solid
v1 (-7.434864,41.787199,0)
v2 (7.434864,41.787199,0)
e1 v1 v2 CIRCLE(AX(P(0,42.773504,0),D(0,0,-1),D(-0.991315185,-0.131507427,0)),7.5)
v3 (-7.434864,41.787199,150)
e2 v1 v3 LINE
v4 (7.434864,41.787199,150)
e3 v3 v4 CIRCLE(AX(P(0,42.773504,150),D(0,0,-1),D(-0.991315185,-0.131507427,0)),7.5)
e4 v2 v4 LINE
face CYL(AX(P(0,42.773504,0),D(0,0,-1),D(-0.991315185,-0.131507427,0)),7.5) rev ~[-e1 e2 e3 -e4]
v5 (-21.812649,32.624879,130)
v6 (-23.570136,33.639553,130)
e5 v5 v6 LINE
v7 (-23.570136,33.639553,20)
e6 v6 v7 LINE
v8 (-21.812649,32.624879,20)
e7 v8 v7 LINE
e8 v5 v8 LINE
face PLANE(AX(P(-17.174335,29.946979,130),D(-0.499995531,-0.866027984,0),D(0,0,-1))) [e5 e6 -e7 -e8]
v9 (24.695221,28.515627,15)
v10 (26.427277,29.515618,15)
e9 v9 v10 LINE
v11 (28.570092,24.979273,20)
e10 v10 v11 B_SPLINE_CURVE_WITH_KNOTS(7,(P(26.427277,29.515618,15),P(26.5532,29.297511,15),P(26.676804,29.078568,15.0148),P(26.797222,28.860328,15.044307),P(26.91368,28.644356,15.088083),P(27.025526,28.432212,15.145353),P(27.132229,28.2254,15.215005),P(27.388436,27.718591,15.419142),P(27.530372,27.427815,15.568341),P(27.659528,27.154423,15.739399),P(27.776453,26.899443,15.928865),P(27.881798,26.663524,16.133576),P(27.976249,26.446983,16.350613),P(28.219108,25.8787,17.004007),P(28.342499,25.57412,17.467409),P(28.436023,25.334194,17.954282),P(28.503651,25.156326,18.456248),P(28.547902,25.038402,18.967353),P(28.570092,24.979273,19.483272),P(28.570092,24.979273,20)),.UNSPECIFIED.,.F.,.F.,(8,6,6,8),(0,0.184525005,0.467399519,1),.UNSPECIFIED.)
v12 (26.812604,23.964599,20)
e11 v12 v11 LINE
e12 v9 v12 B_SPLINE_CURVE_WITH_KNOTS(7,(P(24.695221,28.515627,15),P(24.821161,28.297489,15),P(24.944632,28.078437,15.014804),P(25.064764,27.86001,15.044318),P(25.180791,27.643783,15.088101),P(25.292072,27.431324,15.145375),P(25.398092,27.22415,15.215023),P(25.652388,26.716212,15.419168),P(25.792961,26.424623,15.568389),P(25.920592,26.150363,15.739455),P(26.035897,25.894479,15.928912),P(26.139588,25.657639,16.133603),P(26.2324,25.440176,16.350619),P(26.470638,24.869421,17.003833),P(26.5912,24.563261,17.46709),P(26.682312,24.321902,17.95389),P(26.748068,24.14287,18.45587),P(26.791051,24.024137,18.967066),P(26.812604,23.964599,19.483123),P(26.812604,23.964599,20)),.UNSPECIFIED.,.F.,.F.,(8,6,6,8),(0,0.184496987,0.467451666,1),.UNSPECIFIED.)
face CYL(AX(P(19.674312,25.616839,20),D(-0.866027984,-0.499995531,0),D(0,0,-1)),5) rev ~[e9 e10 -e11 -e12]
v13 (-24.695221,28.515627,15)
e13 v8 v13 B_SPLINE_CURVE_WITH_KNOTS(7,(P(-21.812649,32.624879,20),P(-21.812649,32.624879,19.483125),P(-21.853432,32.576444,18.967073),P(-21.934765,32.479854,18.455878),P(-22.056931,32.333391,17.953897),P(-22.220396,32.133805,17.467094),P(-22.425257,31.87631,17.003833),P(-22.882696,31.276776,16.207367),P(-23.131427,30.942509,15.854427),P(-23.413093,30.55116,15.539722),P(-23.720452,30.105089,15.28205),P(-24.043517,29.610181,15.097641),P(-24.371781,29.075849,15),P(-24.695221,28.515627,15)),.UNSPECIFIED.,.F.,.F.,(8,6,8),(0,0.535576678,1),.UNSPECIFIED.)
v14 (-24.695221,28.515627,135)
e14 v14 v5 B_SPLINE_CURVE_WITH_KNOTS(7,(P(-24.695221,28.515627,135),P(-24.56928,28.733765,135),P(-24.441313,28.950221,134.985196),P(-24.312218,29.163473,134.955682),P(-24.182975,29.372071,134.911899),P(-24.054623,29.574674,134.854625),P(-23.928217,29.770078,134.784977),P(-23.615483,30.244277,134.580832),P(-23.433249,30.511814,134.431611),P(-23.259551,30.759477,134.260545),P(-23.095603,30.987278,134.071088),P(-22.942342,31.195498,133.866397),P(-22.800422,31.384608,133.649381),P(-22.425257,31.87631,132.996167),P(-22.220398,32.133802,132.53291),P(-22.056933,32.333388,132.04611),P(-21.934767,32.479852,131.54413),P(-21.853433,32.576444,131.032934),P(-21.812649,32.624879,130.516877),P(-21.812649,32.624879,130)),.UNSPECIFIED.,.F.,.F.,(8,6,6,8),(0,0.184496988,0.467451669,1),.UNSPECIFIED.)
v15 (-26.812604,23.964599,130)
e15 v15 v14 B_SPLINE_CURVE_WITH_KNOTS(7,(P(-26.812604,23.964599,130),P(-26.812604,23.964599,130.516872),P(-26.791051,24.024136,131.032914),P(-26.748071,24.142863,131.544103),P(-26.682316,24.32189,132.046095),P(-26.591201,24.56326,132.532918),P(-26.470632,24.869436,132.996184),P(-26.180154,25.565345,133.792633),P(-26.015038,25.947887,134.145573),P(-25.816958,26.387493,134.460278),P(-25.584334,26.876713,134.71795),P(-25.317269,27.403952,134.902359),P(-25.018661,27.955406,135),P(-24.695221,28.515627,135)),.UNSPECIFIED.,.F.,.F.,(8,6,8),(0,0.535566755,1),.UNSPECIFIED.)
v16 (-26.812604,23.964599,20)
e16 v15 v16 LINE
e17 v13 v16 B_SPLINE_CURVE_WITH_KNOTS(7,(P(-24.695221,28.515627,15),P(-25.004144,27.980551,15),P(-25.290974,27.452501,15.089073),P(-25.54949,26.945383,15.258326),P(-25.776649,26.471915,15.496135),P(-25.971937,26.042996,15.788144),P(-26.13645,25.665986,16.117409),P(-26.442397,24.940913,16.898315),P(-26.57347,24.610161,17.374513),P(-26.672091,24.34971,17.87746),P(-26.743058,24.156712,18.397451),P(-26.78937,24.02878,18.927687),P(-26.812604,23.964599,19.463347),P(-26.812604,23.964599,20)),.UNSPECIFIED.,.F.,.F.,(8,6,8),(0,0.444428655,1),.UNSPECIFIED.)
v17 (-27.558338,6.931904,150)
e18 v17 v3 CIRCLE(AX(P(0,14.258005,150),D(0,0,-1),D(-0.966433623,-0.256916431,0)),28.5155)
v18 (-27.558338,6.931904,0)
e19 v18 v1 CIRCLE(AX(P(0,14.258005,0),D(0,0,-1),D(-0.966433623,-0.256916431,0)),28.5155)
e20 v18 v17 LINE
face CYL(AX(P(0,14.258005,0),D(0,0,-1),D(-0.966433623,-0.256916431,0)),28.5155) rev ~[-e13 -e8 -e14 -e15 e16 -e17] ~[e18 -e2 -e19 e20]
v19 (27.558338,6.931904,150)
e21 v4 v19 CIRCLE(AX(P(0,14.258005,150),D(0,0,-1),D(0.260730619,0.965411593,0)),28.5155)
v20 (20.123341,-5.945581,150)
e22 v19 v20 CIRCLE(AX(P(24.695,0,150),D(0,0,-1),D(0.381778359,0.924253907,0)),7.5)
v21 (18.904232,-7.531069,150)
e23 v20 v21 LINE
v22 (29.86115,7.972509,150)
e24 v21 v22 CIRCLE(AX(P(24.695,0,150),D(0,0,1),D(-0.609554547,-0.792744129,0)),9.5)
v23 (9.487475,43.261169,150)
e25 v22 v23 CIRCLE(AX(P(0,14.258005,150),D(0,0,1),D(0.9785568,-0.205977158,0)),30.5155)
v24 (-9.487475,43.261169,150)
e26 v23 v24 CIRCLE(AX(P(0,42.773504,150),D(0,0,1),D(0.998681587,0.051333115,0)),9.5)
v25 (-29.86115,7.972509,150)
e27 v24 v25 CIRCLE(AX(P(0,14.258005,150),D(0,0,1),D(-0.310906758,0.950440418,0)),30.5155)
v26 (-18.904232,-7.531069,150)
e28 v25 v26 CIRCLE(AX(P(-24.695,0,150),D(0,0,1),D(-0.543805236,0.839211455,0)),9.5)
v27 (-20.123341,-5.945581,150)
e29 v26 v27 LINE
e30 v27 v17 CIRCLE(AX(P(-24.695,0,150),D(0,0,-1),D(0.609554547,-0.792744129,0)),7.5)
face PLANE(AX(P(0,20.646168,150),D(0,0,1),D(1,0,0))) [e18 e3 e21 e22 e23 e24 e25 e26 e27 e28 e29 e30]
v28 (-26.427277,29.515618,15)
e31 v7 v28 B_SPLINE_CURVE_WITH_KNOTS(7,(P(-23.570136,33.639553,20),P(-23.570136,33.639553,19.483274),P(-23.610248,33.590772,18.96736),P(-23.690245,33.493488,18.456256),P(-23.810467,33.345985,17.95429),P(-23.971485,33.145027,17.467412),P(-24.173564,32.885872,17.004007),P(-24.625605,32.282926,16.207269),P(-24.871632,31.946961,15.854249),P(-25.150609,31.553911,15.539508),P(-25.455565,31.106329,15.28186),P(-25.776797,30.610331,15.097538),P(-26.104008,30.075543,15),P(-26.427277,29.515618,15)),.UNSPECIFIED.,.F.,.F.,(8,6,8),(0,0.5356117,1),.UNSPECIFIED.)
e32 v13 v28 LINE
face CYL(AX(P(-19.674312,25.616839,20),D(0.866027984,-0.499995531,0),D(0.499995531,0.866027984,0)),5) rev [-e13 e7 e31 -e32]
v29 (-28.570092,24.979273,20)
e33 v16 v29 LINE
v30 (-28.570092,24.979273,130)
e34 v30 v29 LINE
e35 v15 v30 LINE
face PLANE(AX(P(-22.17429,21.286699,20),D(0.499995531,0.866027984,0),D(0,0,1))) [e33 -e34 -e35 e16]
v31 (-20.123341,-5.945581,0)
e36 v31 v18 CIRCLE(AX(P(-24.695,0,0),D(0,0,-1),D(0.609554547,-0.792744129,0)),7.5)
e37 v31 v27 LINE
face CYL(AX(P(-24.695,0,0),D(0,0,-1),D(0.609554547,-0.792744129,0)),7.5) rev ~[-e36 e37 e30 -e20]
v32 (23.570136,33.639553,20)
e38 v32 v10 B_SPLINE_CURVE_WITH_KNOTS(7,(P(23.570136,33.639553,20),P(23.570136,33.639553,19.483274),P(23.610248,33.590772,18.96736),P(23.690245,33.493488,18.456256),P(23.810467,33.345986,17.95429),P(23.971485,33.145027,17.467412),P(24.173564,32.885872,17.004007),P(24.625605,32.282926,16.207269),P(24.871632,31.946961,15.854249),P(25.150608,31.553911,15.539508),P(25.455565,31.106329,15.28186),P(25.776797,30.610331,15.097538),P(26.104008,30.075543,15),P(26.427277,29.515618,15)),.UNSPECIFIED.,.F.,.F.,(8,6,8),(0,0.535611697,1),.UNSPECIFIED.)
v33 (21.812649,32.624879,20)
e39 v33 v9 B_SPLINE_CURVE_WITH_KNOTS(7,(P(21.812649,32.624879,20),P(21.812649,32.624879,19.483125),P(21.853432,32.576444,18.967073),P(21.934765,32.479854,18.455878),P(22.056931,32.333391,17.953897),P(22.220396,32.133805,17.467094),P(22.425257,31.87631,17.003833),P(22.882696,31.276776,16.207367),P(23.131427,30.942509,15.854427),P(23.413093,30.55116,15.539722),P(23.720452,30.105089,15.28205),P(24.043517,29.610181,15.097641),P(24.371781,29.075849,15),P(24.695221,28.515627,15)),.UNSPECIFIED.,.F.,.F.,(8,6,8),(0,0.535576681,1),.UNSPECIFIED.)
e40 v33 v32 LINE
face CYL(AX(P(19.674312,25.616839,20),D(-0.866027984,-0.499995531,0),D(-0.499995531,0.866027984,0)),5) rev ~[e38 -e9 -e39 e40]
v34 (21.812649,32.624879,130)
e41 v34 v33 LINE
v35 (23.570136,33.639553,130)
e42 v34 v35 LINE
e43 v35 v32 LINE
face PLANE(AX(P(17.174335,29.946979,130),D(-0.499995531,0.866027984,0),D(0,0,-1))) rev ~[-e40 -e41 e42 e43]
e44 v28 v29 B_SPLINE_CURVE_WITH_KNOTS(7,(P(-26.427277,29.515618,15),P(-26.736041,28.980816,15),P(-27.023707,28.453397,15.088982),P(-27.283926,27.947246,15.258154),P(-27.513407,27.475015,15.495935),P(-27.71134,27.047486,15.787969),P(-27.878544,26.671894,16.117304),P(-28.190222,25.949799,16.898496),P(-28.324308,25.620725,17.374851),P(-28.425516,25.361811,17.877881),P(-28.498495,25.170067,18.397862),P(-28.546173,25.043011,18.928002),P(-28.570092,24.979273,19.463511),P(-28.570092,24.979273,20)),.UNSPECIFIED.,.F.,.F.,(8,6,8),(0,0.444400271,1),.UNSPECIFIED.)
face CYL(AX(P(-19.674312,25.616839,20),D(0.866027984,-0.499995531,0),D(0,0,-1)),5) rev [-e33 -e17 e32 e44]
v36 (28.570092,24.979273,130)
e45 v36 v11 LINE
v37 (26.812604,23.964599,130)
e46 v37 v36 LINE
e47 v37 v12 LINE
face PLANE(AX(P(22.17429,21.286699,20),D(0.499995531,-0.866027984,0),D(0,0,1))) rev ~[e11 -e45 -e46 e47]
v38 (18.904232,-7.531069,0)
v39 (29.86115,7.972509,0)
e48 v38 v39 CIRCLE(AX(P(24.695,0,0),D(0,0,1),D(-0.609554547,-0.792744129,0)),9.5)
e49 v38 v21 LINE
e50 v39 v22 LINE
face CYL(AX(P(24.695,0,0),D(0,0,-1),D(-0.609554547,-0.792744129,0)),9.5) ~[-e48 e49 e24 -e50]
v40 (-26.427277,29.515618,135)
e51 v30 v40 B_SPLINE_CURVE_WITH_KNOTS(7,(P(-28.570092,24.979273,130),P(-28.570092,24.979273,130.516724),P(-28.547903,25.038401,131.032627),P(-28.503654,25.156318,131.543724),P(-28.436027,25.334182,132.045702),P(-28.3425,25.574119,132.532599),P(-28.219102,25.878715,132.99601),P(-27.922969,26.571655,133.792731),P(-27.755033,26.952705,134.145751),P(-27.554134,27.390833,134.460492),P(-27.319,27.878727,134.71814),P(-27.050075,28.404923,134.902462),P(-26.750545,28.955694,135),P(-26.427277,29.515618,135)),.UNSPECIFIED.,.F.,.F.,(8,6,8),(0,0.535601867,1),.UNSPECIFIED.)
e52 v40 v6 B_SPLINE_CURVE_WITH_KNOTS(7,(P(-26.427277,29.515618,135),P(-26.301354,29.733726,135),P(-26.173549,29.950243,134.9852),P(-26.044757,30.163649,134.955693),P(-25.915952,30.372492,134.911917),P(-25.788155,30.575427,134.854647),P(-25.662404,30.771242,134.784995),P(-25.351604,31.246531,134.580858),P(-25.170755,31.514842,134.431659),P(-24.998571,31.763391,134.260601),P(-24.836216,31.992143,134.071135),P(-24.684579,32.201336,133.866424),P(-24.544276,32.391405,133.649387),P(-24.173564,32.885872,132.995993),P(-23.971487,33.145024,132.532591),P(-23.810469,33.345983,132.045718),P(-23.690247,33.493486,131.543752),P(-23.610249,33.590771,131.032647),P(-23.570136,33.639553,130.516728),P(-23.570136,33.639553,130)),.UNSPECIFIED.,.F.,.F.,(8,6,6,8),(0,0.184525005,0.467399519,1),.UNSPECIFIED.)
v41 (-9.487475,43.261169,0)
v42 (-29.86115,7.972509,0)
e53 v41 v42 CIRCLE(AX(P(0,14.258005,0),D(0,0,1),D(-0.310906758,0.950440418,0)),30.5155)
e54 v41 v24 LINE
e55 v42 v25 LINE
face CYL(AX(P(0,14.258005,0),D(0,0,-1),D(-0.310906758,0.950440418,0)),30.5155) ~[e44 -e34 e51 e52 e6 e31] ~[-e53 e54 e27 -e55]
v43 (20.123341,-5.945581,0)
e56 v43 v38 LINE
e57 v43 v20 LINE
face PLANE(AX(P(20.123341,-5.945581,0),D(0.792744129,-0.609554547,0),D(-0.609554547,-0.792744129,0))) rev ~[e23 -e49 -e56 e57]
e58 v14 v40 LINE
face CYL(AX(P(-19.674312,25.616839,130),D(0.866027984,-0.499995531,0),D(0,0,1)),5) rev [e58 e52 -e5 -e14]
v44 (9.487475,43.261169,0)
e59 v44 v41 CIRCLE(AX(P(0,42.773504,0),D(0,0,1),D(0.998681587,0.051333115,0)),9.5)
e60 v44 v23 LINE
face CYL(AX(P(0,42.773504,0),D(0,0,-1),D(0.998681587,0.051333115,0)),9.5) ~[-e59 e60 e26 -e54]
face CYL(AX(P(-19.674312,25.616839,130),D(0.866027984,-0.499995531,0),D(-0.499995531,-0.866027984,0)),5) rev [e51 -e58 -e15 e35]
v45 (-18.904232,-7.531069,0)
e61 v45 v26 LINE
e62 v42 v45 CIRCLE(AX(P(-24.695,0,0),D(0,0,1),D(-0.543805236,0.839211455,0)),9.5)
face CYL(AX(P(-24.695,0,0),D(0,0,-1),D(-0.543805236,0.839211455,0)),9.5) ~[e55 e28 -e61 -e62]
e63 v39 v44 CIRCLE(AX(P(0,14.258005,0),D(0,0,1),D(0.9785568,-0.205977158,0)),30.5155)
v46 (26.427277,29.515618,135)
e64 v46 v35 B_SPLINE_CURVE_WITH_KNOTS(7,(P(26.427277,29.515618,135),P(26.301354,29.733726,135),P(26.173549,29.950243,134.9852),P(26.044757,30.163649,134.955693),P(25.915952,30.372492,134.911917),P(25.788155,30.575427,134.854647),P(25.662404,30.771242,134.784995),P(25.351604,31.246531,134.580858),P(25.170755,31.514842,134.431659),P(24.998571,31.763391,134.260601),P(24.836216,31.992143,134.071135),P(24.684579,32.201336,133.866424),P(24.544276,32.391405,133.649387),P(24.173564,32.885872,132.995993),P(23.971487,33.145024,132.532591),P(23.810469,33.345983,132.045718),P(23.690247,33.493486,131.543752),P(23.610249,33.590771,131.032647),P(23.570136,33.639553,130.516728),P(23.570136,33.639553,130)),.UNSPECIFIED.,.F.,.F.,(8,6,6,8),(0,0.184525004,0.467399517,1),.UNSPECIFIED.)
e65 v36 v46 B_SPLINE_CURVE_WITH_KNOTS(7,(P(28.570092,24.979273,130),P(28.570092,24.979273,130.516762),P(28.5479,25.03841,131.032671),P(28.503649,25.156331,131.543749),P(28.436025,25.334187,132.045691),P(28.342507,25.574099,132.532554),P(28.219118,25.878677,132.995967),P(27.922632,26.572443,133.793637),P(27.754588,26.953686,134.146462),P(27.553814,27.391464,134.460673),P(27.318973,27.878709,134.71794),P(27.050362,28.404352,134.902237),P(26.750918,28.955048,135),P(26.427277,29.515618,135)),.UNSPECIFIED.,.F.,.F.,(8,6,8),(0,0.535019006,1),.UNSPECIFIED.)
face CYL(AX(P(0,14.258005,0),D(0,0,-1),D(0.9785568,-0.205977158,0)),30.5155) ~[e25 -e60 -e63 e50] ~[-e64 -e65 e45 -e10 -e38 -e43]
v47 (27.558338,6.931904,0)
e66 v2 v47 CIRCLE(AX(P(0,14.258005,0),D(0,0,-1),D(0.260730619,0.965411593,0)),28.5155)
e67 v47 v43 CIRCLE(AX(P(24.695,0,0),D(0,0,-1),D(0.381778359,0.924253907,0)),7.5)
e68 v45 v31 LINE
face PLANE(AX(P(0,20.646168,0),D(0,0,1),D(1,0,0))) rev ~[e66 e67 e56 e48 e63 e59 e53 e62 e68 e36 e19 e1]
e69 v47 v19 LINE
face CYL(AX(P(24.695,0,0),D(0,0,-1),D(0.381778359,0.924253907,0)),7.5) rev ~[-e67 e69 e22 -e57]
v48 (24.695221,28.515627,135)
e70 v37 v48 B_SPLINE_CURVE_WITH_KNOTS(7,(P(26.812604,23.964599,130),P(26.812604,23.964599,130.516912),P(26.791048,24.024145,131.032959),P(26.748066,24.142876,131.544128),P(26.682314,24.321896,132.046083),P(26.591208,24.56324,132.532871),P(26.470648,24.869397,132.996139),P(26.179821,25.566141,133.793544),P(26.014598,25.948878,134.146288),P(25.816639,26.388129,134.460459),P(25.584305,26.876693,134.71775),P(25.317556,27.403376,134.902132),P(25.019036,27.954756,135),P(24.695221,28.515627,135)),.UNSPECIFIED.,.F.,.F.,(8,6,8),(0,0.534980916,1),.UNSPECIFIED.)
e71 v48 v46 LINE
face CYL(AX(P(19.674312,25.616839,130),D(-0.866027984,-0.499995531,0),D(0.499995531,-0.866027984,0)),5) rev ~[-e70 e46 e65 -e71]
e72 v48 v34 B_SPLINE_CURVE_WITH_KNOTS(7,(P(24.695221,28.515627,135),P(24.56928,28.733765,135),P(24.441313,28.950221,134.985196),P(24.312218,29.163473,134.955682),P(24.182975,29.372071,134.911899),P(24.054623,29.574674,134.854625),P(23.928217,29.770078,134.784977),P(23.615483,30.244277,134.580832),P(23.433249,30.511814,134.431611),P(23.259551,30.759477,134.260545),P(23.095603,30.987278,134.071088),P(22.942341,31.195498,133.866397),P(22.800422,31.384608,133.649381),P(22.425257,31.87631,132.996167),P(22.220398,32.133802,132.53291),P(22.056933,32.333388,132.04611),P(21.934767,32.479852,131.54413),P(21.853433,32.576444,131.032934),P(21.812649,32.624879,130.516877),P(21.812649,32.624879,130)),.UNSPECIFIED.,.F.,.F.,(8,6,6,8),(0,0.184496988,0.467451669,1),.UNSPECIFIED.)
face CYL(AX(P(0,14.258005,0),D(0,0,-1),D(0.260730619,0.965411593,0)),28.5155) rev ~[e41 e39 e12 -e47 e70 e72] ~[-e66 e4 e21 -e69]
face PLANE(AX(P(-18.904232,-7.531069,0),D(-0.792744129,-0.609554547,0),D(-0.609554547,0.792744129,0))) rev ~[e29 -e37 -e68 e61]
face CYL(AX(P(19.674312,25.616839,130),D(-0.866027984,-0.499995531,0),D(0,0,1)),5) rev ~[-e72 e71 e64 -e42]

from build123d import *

# Parameters (mm, degrees)
F1_DEPTH = 150
F4_DEPTH = 14.6
F7_DEPTH = 25


with BuildPart() as f1:
    # F0 (on Top) → F1 (new body)
    with BuildSketch(Plane.XY):
        with BuildLine():
            ThreePointArc((-20.1233408974, -5.9455809682), (-31.1901518255, -3.7500670345), (-27.5583376919, 6.9319043027))
            ThreePointArc((-27.5583376919, 6.9319043027), (-24.6952207253, 28.5156271448), (-7.4348638898, 41.787198732))
            ThreePointArc((-7.4348638898, 41.787198732), (0, 50.2735044354), (7.4348638898, 41.787198732))
            ThreePointArc((7.4348638898, 41.787198732), (24.6952207253, 28.5156271448), (27.5583376919, 6.9319043027))
            ThreePointArc((27.5583376919, 6.9319043027), (31.1901518255, -3.7500670345), (20.1233408974, -5.9455809682))
            Line((20.1233408974, -5.9455809682), (18.9042318034, -7.5310692264))
            ThreePointArc((18.9042318034, -7.5310692264), (32.4530777326, -5.4829034184), (29.8611497399, 7.9725088187))
            ThreePointArc((29.8611497399, 7.9725088187), (26.4272766932, 29.5156182068), (9.4874750724, 43.2611690236))
            ThreePointArc((9.4874750724, 43.2611690236), (0, 52.2735044354), (-9.4874750724, 43.2611690236))
            ThreePointArc((-9.4874750724, 43.2611690236), (-26.4272766932, 29.5156182068), (-29.8611497399, 7.9725088187))
            ThreePointArc((-29.8611497399, 7.9725088187), (-32.4530777326, -5.4829034184), (-18.9042318034, -7.5310692264))
            Line((-18.9042318034, -7.5310692264), (-20.1233408974, -5.9455809682))
        make_face()
    extrude(amount=F1_DEPTH)

    # F3 (on 3pt) → F4 (cut)
    with BuildSketch(Plane(origin=(25.8481727674, 14.9232716588, 0), x_dir=(0.499995531, -0.8660279839, 0), z_dir=(-0.8660279839, -0.499995531, 0))):
        with BuildLine():
            Line((-7.3478311295, 20), (-7.3478311295, 130))
            ThreePointArc((-7.3478311295, 130), (-8.8122972235, 133.5355339059), (-12.3478311295, 135))
            ThreePointArc((-12.3478311295, 135), (-15.8833650354, 133.5355339059), (-17.3478311295, 130))
            Line((-17.3478311295, 130), (-17.3478311295, 20))
            ThreePointArc((-17.3478311295, 20), (-15.8833650354, 16.4644660941), (-12.3478311295, 15))
            ThreePointArc((-12.3478311295, 15), (-8.8122972235, 16.4644660941), (-7.3478311295, 20))
        make_face()
    extrude(amount=-F4_DEPTH, mode=Mode.SUBTRACT)

    # F6 (on 3pt) → F7 (cut)
    with BuildSketch(Plane(origin=(-25.8481727674, 14.9232716588, 0), x_dir=(-0.499995531, -0.8660279839, 0), z_dir=(-0.8660279839, 0.499995531, 0))):
        with BuildLine():
            ThreePointArc((-12.3478310445, 135), (-15.8833649505, 133.5355339059), (-17.3478310445, 130))
            Line((-17.3478310445, 130), (-17.3478310445, 20))
            ThreePointArc((-17.3478310445, 20), (-15.8833649505, 16.4644660941), (-12.3478310445, 15))
            ThreePointArc((-12.3478310445, 15), (-8.8122971386, 16.4644660941), (-7.3478310445, 20))
            Line((-7.3478310445, 20), (-7.3478310445, 130))
            ThreePointArc((-7.3478310445, 130), (-8.8122971386, 133.5355339059), (-12.3478310445, 135))
        make_face()
    extrude(amount=F7_DEPTH, mode=Mode.SUBTRACT)


solid = f1.part
